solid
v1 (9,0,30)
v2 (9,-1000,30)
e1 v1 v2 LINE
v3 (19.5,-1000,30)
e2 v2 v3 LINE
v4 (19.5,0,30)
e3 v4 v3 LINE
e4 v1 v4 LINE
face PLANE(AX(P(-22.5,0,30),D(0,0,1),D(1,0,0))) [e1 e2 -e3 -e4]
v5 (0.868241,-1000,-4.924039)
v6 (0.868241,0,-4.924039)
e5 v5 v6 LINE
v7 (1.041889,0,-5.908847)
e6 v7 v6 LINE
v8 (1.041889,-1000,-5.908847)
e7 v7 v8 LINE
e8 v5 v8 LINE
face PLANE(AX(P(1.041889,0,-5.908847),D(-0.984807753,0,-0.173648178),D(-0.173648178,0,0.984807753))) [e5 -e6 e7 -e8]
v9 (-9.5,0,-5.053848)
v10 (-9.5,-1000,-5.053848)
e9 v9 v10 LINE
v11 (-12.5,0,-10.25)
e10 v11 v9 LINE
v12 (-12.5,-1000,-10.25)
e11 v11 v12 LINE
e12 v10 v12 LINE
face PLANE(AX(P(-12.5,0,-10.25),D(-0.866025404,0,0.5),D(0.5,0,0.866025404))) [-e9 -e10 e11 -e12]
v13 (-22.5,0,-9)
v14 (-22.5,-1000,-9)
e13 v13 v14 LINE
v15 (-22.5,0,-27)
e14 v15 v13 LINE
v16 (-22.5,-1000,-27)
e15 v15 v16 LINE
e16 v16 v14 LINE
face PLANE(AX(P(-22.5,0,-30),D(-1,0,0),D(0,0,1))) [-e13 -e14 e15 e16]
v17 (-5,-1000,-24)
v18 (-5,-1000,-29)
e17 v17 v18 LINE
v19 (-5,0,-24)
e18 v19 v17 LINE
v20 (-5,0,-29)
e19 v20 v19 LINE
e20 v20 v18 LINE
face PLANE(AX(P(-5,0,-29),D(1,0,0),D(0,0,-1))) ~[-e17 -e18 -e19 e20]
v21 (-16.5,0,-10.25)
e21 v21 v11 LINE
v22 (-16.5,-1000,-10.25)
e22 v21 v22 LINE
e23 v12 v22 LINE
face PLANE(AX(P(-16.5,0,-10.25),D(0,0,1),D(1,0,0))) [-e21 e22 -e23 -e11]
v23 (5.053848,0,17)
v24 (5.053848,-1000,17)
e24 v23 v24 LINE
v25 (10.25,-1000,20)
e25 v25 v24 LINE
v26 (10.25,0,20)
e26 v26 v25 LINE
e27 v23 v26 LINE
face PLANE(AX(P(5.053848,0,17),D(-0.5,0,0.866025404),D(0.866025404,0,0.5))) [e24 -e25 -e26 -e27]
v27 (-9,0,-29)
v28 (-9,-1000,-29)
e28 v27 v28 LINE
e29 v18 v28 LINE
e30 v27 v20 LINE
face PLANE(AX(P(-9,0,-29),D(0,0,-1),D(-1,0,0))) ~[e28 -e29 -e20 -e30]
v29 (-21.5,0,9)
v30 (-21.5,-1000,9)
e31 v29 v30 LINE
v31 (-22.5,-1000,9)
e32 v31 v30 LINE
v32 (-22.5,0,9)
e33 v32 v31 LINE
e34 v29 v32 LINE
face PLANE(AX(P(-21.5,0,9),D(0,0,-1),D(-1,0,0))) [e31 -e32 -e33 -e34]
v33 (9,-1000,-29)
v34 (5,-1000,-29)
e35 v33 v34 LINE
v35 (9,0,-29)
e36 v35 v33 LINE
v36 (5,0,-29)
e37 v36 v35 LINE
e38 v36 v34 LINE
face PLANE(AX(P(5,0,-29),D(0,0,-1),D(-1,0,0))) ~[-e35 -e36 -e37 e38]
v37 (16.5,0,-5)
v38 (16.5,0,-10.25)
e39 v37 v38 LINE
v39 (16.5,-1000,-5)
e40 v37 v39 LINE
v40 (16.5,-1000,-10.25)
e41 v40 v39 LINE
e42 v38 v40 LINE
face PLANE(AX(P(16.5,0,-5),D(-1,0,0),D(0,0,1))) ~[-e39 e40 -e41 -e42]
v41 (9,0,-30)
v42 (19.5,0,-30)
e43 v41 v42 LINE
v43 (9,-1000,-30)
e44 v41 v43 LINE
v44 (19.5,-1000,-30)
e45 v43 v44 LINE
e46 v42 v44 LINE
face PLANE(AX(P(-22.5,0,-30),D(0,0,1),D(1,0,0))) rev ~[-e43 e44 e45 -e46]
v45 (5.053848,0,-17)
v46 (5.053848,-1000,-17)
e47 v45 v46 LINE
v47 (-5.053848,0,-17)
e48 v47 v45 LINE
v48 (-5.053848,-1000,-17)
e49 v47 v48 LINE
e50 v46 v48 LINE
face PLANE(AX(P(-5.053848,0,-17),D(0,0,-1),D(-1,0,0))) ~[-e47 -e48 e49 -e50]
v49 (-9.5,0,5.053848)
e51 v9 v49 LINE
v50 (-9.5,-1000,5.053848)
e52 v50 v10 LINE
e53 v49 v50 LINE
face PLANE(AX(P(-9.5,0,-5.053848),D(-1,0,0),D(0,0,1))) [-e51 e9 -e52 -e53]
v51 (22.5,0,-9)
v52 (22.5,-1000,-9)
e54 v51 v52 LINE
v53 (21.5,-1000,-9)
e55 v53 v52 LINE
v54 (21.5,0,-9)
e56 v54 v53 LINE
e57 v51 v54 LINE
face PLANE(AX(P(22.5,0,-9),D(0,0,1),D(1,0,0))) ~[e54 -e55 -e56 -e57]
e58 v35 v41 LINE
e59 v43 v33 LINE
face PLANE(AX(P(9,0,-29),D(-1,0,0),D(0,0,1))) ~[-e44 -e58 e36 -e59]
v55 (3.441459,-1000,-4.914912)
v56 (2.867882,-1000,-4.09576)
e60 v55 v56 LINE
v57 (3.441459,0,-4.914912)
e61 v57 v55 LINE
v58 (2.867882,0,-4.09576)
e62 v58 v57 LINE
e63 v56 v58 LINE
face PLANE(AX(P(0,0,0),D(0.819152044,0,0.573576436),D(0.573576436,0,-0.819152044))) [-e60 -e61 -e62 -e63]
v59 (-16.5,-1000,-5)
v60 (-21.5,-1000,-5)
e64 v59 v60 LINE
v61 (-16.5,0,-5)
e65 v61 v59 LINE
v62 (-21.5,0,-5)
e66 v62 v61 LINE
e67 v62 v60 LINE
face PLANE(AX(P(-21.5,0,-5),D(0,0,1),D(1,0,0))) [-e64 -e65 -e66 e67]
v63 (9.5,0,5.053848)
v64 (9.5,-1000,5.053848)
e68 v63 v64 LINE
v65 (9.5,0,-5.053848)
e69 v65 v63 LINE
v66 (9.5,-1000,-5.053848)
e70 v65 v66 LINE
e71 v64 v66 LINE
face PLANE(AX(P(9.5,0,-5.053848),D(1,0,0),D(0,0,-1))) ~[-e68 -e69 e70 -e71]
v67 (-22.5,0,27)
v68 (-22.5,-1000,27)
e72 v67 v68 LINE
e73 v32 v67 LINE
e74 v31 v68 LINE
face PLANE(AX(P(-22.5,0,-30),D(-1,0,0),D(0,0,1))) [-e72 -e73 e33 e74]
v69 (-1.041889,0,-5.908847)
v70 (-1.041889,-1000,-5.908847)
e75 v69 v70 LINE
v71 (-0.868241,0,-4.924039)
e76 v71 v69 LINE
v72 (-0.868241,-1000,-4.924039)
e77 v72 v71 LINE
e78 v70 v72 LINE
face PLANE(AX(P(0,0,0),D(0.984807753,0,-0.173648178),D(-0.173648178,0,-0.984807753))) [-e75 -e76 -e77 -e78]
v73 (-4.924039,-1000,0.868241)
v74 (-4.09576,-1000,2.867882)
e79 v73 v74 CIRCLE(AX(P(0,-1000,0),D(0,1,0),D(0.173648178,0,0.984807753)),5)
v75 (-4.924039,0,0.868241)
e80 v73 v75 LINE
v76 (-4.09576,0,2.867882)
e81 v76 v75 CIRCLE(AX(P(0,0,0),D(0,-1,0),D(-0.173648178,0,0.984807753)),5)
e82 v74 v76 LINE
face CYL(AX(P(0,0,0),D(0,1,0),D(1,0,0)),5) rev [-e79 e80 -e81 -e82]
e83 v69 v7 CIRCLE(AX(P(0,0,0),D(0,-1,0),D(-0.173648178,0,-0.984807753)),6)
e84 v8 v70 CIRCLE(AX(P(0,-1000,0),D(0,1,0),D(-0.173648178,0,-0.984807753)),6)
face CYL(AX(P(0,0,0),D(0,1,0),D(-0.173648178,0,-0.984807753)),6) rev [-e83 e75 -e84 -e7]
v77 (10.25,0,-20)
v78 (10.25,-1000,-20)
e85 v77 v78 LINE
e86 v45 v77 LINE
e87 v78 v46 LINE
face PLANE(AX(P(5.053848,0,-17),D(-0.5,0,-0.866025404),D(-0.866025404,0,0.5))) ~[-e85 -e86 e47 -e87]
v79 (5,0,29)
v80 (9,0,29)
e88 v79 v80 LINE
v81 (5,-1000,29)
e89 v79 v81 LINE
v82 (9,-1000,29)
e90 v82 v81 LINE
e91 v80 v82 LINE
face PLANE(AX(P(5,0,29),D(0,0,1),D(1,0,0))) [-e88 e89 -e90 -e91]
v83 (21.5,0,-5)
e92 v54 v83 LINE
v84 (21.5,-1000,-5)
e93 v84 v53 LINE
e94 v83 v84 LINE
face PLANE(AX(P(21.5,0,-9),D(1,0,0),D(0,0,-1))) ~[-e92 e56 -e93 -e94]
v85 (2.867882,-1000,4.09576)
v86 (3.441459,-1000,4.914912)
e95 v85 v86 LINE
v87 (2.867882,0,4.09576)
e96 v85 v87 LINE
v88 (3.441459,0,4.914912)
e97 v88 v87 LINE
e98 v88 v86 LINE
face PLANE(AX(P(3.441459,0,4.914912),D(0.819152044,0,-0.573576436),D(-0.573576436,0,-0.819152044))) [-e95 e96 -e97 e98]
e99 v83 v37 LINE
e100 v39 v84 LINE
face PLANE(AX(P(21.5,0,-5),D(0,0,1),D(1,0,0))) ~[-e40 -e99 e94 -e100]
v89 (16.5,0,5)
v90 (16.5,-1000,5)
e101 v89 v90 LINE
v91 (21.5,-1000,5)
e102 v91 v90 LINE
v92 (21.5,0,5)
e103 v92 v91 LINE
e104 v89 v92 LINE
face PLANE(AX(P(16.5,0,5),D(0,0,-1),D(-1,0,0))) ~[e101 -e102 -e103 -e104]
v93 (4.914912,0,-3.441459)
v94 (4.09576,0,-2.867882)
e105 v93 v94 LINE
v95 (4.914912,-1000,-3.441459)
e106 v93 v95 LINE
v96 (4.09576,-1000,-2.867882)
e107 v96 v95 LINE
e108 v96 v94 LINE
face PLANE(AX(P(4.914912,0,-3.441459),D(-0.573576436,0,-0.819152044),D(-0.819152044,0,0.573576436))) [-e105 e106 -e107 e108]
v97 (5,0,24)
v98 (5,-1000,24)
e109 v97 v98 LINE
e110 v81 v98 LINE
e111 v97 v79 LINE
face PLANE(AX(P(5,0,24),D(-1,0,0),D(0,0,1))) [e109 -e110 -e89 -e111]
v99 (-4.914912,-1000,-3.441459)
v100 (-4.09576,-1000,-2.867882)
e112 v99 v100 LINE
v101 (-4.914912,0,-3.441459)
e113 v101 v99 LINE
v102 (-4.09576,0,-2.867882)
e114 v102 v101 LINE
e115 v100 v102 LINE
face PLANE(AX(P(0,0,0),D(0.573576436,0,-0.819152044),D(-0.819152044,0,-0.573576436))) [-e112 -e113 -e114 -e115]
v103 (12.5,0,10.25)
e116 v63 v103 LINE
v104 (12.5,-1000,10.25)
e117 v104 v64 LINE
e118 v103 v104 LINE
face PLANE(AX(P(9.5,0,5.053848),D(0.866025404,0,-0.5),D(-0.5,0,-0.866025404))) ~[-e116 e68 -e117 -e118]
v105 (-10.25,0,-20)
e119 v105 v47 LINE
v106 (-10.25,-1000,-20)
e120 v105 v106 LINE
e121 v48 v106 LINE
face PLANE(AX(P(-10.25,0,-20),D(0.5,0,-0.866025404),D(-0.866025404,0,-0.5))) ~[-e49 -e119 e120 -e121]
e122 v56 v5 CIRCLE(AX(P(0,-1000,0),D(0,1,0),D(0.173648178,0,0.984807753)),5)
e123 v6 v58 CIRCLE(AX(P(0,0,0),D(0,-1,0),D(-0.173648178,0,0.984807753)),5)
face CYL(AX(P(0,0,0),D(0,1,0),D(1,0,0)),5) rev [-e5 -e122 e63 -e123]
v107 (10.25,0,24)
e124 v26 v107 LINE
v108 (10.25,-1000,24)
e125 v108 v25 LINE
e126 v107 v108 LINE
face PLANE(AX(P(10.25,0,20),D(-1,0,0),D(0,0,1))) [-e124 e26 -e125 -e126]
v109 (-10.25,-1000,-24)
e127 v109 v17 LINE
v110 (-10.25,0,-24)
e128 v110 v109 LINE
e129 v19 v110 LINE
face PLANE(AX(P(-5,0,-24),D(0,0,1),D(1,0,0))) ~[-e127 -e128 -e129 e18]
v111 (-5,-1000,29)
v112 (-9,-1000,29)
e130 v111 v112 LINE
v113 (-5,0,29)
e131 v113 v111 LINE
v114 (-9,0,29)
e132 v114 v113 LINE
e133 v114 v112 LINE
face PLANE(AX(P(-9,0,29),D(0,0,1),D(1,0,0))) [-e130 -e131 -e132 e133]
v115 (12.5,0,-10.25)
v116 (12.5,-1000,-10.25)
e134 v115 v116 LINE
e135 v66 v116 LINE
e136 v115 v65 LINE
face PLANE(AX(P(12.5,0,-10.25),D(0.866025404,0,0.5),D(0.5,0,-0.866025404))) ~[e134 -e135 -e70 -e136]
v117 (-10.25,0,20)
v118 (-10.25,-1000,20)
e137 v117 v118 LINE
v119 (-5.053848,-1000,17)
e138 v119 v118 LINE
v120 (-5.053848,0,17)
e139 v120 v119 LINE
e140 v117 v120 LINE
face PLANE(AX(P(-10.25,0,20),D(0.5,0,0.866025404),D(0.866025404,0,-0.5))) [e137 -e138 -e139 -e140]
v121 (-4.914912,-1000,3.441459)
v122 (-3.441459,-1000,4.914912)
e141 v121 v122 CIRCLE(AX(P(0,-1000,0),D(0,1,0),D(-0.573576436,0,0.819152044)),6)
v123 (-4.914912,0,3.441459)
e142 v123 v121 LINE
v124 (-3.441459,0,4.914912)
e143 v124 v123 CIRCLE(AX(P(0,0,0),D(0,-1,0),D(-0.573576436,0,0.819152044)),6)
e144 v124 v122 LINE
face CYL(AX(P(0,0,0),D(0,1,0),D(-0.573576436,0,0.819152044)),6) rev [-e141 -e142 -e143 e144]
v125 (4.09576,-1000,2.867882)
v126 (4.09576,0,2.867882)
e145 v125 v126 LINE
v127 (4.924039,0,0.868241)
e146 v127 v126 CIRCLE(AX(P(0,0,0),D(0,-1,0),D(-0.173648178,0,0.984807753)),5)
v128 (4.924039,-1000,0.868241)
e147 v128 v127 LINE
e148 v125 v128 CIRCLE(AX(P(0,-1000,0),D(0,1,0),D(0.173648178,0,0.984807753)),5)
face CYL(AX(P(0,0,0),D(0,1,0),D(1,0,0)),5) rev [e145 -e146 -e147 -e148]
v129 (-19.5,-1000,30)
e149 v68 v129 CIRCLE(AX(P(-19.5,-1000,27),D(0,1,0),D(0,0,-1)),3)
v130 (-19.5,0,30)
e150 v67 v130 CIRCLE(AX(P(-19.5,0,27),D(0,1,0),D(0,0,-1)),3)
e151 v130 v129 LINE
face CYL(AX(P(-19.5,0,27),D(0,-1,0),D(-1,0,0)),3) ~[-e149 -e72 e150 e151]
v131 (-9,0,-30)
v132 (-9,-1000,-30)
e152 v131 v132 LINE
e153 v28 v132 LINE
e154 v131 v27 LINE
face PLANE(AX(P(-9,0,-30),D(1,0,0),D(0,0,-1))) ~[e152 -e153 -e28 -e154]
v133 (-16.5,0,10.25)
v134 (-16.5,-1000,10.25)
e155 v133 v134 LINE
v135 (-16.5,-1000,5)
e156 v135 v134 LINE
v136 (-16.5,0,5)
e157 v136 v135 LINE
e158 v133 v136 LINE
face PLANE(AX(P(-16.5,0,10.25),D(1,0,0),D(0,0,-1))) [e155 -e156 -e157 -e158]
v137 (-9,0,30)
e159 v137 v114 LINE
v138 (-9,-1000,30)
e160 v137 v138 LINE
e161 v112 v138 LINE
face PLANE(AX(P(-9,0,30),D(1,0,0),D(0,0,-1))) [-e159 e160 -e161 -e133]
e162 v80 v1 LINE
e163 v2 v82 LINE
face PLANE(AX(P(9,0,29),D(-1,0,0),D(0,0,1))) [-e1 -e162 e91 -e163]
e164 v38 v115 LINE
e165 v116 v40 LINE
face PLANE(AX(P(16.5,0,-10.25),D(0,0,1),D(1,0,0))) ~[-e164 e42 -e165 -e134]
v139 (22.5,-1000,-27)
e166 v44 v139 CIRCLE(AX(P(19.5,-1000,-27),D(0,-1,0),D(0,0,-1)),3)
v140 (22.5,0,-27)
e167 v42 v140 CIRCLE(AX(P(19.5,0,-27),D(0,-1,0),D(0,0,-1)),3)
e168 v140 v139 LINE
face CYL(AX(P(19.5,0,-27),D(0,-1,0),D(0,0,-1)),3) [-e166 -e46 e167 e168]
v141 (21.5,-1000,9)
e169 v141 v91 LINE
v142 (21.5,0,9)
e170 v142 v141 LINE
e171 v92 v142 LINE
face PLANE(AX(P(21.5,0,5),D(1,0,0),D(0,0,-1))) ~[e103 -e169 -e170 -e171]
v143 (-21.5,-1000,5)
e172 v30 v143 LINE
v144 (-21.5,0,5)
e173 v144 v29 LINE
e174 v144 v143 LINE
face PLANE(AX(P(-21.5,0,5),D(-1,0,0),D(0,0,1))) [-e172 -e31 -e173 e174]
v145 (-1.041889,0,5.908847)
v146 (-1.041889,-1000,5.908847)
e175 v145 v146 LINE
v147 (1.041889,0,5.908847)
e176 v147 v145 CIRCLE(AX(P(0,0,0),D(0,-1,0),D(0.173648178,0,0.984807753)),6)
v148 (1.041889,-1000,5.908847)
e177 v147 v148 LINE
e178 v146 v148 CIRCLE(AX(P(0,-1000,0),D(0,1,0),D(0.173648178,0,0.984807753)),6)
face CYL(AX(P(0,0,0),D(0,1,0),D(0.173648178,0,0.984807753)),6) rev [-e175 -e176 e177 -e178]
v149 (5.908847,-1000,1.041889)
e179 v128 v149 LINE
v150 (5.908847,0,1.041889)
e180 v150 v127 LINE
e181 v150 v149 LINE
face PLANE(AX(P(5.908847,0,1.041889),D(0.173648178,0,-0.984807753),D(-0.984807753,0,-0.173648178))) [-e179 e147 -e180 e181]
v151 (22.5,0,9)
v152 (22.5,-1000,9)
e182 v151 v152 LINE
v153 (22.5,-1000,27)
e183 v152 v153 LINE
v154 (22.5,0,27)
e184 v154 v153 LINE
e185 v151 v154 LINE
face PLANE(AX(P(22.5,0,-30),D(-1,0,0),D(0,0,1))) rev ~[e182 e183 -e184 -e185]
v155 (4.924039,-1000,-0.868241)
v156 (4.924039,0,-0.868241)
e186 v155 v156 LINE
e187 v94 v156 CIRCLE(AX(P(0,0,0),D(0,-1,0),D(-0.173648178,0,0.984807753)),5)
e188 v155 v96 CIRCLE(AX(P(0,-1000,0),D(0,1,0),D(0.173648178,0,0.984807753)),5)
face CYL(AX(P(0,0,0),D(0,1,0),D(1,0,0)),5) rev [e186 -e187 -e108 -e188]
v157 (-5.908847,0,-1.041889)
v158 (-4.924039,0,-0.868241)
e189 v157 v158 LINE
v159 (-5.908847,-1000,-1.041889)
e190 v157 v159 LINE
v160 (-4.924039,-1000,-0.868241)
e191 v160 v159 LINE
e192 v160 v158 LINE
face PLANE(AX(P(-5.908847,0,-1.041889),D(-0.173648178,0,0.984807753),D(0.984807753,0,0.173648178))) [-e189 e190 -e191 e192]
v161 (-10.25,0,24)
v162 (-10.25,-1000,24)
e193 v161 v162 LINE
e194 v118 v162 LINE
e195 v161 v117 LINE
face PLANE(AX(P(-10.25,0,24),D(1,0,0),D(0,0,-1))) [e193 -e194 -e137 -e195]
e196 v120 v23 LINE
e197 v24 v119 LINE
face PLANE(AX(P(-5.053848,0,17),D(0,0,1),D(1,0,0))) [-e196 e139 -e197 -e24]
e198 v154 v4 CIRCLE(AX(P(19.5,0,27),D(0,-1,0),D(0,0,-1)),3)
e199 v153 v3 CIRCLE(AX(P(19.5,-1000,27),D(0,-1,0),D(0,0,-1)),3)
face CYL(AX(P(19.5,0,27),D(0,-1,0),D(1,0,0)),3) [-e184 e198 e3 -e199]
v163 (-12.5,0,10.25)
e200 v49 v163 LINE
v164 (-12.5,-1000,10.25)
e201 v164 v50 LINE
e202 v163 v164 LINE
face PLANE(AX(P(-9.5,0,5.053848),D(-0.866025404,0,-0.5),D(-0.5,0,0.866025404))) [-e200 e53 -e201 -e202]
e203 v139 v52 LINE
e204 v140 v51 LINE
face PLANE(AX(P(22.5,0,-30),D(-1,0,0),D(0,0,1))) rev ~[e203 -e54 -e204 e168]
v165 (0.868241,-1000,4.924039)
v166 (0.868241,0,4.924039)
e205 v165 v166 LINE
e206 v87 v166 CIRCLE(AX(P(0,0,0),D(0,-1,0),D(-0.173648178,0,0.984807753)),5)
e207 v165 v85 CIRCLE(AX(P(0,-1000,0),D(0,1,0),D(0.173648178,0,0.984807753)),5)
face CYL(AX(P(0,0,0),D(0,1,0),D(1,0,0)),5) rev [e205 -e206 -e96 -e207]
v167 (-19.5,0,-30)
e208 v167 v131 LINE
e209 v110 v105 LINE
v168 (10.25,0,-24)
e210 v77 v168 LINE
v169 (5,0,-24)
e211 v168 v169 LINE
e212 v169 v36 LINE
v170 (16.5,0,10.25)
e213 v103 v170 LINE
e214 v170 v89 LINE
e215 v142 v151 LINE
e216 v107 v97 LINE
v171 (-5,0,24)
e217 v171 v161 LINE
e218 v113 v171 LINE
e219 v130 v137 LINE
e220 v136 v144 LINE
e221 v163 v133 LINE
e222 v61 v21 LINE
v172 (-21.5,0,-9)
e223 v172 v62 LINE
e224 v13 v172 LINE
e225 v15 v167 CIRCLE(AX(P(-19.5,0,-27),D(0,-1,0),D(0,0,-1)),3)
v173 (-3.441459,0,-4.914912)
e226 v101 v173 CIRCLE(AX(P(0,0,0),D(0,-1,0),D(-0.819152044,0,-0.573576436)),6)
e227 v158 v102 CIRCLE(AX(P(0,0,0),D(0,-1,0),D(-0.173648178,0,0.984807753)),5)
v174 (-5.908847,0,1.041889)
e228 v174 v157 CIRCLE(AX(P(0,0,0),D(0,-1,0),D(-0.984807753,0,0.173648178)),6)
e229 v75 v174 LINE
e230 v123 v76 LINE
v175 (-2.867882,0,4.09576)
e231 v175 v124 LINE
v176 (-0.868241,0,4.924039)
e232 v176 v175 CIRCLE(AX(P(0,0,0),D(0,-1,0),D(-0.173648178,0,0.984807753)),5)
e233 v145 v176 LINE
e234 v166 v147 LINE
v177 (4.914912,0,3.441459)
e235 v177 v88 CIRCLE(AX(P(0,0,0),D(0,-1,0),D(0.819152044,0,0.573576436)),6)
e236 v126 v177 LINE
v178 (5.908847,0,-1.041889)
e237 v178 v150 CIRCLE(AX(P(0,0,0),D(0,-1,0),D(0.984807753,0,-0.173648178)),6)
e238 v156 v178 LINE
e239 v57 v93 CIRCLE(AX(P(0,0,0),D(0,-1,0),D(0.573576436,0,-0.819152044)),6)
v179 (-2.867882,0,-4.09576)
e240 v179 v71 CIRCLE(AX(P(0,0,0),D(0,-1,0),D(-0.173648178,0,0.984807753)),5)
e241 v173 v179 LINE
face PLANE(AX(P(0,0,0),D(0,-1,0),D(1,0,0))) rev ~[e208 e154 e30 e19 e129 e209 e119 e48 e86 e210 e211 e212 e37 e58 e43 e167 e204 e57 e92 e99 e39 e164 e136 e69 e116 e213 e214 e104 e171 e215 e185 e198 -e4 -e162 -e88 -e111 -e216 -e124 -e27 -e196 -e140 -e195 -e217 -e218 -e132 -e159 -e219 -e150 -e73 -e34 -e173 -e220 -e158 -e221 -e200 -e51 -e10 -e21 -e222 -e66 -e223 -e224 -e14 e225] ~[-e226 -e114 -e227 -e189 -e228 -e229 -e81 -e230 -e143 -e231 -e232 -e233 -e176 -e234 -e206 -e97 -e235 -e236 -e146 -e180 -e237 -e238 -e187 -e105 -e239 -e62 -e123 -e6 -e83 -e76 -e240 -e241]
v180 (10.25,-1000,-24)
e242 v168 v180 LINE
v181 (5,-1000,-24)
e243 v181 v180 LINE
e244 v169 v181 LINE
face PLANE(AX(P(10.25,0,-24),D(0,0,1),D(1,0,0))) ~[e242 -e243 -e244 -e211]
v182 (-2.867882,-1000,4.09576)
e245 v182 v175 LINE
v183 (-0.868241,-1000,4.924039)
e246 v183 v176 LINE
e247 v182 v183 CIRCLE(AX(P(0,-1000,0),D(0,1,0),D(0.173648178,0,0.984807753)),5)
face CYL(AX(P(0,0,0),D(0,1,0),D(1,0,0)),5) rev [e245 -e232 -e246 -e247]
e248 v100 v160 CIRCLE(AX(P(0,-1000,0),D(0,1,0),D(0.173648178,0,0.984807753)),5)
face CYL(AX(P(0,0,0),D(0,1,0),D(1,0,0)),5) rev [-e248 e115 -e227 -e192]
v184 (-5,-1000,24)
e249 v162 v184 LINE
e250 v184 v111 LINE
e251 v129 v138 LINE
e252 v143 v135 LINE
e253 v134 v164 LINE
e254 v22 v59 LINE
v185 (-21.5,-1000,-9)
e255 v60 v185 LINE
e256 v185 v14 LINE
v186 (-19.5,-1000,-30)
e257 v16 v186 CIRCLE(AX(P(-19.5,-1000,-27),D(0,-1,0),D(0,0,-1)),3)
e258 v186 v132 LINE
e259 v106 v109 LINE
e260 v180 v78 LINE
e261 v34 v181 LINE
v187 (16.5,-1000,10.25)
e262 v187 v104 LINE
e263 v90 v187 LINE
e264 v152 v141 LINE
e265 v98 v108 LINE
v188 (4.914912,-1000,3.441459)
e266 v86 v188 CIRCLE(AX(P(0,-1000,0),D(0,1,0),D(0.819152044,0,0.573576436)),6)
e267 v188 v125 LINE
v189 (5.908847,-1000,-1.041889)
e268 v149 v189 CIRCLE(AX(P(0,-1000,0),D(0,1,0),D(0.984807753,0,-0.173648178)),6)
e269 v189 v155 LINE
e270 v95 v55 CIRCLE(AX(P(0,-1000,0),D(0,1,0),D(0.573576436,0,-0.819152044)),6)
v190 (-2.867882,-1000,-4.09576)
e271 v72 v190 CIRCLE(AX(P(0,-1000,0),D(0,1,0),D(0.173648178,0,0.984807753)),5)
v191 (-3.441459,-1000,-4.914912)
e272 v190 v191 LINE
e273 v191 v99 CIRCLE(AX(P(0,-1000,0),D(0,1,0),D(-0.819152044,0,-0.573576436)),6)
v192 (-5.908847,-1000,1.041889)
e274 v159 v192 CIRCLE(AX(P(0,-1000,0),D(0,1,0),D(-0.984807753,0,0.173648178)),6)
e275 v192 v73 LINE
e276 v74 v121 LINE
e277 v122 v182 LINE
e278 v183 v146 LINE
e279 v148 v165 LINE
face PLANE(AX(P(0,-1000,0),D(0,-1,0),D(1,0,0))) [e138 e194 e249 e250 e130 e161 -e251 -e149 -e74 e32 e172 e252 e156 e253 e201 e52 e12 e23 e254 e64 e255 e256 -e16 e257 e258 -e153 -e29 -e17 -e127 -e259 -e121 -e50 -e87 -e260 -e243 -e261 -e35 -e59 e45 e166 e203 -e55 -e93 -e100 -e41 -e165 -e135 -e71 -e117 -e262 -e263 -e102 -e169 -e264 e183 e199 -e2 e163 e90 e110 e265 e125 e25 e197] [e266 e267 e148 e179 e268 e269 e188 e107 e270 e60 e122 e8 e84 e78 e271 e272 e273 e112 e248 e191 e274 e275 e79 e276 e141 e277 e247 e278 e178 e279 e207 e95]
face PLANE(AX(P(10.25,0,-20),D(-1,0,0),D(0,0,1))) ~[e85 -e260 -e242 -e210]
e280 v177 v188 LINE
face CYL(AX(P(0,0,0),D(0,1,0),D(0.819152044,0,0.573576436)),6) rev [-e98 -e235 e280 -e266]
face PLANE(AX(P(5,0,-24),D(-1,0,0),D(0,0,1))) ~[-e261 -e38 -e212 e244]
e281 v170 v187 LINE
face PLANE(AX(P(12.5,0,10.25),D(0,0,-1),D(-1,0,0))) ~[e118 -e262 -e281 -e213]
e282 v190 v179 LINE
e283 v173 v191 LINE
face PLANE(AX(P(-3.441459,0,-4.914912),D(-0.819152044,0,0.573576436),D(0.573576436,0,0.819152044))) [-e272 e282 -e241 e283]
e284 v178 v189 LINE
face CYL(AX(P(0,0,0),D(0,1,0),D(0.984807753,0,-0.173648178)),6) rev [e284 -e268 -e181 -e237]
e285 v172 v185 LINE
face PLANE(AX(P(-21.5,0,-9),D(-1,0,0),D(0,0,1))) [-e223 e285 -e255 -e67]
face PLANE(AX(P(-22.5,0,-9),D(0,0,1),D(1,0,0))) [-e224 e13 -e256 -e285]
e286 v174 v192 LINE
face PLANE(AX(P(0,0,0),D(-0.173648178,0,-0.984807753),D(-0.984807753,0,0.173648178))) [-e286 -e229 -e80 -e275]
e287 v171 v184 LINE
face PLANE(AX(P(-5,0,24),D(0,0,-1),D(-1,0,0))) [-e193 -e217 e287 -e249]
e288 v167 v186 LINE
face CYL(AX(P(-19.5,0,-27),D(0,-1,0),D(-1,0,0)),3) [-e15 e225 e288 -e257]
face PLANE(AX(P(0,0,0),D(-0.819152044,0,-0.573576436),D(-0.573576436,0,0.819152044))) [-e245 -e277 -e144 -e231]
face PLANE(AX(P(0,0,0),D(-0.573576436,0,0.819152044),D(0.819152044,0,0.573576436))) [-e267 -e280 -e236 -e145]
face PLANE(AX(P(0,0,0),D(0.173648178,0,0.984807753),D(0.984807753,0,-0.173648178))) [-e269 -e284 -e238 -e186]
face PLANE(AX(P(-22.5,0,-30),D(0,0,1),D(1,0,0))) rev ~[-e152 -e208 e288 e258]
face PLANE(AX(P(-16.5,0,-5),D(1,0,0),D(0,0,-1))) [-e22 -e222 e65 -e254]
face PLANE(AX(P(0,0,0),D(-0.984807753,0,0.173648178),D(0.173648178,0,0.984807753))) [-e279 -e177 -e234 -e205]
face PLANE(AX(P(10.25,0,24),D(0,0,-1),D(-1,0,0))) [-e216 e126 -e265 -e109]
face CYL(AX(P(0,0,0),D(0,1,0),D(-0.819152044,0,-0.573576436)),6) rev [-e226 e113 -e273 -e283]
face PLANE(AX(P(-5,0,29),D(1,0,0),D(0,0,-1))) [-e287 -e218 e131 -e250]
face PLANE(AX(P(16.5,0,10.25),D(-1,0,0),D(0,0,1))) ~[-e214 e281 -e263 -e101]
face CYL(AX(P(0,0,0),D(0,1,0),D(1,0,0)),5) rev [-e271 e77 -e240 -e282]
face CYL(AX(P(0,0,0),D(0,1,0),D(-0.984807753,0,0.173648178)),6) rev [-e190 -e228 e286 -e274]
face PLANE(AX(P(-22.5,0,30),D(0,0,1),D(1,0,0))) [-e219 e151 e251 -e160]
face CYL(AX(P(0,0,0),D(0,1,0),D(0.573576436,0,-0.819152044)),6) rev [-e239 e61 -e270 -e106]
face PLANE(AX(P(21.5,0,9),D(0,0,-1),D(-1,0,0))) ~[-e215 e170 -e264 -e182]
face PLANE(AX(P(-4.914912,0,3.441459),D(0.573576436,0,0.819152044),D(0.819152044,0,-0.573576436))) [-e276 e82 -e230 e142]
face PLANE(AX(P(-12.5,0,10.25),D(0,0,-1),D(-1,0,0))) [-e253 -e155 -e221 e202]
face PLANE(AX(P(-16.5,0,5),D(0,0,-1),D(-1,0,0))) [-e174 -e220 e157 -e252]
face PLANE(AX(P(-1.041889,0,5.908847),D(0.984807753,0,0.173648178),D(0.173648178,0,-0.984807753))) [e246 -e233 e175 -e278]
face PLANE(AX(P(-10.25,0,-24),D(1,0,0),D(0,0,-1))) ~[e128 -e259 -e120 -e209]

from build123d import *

# Parameters (mm, degrees)
F0_W             = 45
F0_H             = 60
F1_DEPTH         = 1000
F2_R             = 3
F3_R             = 5
F4_DEPTH         = 1000.001
F6_DEPTH         = 1000.001
F8_DEPTH         = 1000.001
F10_DEPTH        = 1000.001
F10_COPIES_COUNT = 8


# Not quite as in the source:
# - a pattern or mirror of a feature is missing from the dataset's text; its kind, count and spacing are read off the source's solid


with BuildPart() as f1:
    # F0 (on Front) → F1 (new body)
    with BuildSketch(Plane.XZ):
        Rectangle(F0_W, F0_H)
    extrude(amount=F1_DEPTH)

    # F2
    f2_edges = [f1.edges().sort_by_distance(p)[0] for p in [
        (-22.5, -500, -30),
        (-22.5, -500, 30),
        (22.5, -500, -30),
        (22.5, -500, 30),
    ]]
    fillet(f2_edges, radius=F2_R)

    # F3 (on Front) → F4 (cut, through all)
    with BuildSketch(Plane.XZ):
        Circle(F3_R)
    extrude(amount=F4_DEPTH, mode=Mode.SUBTRACT)

    # F5 (on Front) → F6 (cut, through all)
    with BuildSketch(Plane.XZ):
        Polygon((9, 30), (-9, 30), (-9, 29), (-5, 29), (-5, 24), (-10.25, 24), (-10.25, 20), (-5.0538475773, 17), (5.0538475773, 17), (10.25, 20), (10.25, 24), (5, 24), (5, 29), (9, 29), align=None)
    f6 = extrude(amount=F6_DEPTH, mode=Mode.SUBTRACT)

    # F6_copies: F6 across plane
    add(f6.mirror(Plane(origin=(0, 0, 0), x_dir=(-1, 0, 0), z_dir=(0, 0, -1))), mode=Mode.SUBTRACT)

    # F7 (on Front) → F8 (cut, through all)
    with BuildSketch(Plane.XZ):
        Polygon((-21.5, 9), (-22.5, 9), (-22.5, -9), (-21.5, -9), (-21.5, -5), (-16.5, -5), (-16.5, -10.25), (-12.5, -10.25), (-9.5, -5.0538475773), (-9.5, 5.0538475773), (-12.5, 10.25), (-16.5, 10.25), (-16.5, 5), (-21.5, 5), align=None)
    f8 = extrude(amount=F8_DEPTH, mode=Mode.SUBTRACT)

    # F8_copies: F8 across plane
    add(f8.mirror(Plane(origin=(0, 0, 0), x_dir=(0, 0, 1), z_dir=(1, 0, 0))), mode=Mode.SUBTRACT)

    # F9 (on Front) → F10 (cut, through all)
    with BuildSketch(Plane.XZ):
        with BuildLine():
            Line((0, 0), (1.041889066, 5.9088465181))
            ThreePointArc((1.041889066, 5.9088465181), (0, 6), (-1.041889066, 5.9088465181))
            Line((-1.041889066, 5.9088465181), (0, 0))
        make_face()
    f10 = extrude(amount=F10_DEPTH, mode=Mode.SUBTRACT)

    # F10_copies: F10 ×8 about axis
    f10_copies_axis = Axis((0, 0, 0), (0, 1, 0))
    for i in range(1, F10_COPIES_COUNT):
        add(f10.rotate(f10_copies_axis, i * 360 / F10_COPIES_COUNT), mode=Mode.SUBTRACT)


solid = f1.part
